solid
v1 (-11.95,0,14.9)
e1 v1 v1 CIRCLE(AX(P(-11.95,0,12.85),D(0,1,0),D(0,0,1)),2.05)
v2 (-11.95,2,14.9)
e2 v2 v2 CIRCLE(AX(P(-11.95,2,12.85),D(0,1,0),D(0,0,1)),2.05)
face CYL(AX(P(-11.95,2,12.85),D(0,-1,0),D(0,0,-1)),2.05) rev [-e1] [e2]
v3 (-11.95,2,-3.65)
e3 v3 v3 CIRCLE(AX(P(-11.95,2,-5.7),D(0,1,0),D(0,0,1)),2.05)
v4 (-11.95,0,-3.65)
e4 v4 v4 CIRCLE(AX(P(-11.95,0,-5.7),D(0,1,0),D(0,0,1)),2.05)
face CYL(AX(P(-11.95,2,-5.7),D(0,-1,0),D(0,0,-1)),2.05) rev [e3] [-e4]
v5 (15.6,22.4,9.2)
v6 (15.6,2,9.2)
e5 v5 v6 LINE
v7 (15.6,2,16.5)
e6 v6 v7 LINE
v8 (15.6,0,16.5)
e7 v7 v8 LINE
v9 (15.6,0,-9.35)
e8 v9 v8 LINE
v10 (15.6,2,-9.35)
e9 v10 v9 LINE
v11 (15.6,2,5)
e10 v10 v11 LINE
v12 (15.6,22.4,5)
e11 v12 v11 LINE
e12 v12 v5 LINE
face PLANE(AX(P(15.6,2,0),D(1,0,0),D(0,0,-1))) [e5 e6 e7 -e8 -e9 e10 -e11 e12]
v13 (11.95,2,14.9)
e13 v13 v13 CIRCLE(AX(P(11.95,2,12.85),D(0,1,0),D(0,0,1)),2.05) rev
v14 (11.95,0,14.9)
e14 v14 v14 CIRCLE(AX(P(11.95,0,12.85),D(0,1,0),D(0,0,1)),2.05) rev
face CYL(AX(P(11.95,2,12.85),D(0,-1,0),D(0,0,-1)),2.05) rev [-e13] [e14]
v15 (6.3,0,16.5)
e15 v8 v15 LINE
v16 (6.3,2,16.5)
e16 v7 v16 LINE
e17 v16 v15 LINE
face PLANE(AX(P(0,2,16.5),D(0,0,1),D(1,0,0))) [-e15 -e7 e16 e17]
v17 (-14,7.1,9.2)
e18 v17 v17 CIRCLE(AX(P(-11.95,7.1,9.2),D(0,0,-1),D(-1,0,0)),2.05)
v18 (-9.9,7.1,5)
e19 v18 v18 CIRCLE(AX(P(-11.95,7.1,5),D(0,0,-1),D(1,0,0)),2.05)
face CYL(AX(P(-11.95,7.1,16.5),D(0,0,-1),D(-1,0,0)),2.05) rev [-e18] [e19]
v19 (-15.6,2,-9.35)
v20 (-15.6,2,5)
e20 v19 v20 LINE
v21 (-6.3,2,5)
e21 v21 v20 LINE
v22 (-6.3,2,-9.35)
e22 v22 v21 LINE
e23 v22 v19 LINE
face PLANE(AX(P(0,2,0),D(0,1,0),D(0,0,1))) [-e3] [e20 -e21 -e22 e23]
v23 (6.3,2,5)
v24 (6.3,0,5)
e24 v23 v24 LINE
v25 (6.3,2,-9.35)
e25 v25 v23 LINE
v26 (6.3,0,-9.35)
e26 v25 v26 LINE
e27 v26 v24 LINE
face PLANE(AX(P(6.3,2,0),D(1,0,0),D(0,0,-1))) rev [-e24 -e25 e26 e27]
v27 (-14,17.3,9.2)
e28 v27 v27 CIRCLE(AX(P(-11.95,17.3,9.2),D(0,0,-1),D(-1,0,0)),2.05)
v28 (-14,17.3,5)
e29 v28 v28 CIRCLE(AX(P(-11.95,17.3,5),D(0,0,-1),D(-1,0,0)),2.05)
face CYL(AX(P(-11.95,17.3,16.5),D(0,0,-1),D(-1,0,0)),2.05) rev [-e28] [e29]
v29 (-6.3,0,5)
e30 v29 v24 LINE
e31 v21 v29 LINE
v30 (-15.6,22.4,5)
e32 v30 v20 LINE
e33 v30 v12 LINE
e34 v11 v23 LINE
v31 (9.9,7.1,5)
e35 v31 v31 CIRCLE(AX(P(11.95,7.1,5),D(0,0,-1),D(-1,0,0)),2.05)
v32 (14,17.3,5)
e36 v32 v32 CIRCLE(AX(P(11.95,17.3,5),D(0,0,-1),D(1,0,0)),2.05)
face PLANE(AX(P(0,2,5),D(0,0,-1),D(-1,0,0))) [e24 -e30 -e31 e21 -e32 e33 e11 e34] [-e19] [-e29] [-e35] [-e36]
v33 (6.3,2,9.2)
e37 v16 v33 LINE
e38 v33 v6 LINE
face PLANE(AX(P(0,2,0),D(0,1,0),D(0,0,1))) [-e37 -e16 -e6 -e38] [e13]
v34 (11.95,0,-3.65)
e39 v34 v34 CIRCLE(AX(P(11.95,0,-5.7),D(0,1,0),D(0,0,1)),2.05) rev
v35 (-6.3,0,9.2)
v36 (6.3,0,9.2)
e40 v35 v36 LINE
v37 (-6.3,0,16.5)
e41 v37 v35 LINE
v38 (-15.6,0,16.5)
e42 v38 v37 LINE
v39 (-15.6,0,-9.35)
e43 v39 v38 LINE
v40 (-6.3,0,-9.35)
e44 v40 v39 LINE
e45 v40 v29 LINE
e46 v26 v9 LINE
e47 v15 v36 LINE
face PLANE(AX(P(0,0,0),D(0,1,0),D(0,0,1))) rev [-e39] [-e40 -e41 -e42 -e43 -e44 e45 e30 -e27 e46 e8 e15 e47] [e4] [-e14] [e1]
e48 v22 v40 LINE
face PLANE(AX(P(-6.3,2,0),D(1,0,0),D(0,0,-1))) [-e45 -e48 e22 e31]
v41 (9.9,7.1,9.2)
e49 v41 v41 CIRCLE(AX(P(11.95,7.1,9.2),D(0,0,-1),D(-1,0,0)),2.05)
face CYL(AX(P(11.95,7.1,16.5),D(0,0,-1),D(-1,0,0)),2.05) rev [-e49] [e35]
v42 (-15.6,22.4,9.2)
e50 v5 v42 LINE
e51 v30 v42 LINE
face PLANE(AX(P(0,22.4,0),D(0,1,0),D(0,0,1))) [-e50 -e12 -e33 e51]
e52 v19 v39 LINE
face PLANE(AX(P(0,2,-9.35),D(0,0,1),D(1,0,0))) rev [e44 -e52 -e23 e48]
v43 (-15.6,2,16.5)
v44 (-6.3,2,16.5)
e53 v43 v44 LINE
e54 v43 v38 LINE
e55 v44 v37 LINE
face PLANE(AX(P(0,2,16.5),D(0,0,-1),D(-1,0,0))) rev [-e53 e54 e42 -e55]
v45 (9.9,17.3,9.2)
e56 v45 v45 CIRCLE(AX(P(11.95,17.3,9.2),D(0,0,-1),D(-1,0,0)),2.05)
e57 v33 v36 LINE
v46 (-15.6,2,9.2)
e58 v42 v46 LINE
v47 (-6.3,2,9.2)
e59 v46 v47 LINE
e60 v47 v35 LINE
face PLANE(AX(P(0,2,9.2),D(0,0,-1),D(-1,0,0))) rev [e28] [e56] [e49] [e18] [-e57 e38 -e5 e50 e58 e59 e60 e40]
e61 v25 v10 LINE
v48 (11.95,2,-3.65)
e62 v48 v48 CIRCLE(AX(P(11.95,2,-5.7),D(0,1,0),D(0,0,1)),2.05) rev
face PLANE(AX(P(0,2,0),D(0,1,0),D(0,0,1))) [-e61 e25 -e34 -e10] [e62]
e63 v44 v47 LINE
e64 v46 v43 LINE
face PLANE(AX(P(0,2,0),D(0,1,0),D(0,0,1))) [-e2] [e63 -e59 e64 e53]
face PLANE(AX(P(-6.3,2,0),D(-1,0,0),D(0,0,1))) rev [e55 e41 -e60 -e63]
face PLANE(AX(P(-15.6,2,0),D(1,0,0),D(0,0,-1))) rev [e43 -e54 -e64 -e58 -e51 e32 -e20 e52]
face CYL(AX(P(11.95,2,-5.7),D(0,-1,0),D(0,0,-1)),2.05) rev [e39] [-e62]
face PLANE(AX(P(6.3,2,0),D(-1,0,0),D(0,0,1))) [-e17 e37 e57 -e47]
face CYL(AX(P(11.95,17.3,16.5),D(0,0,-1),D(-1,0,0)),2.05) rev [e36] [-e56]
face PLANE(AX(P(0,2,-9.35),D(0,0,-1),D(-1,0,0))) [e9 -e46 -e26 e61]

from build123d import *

# Parameters (mm, degrees)
SKETCH1_R               = 2.05
BOSS_EXTRUDE1_DEPTH     = 2
BOSS_EXTRUDE2_START     = 2
BOSS_EXTRUDE2_OUTLINE_W = 31.2
BOSS_EXTRUDE2_OUTLINE_H = 4.2
BOSS_EXTRUDE2_DEPTH     = 20.4
SKETCH2_R               = 2.05
CUT_EXTRUDE1_DEPTH      = 31.838976961


# Read off the part's stored shape, not the designer's step: Boss-Extrude2
with BuildPart() as part:
    # Sketch1 → Boss-Extrude1 (new body)
    with BuildSketch(Plane(origin=(0, 0, 0), x_dir=(1, 0, 0), z_dir=(0, 1, 0))):
        Polygon((-6.3, -5), (-6.3, 9.35), (-15.6, 9.35), (-15.6, -16.5), (-6.3, -16.5), (-6.3, -9.2), (6.3, -9.2), (6.3, -16.5), (15.6, -16.5), (15.6, 9.35), (6.3, 9.35), (6.3, -5), align=None)
        with Locations(Location((11.95, -12.85, 0), (0, 0, 270))):
            Circle(SKETCH1_R, mode=Mode.SUBTRACT)
        with Locations(Location((-11.95, -12.85, 0), (0, 0, 270))):
            Circle(SKETCH1_R, mode=Mode.SUBTRACT)
        with Locations(Location((11.95, 5.7, 0), (0, 0, 270))):
            Circle(SKETCH1_R, mode=Mode.SUBTRACT)
        with Locations(Location((-11.95, 5.7, 0), (0, 0, 270))):
            Circle(SKETCH1_R, mode=Mode.SUBTRACT)
    extrude(amount=BOSS_EXTRUDE1_DEPTH)

    # Boss-Extrude2 outline → Boss-Extrude2 (add)
    with BuildSketch(Plane(origin=(0, 0, 0), x_dir=(1, 0, 0), z_dir=(0, 1, 0)).offset(BOSS_EXTRUDE2_START)):
        with Locations((0, -7.1)):
            Rectangle(BOSS_EXTRUDE2_OUTLINE_W, BOSS_EXTRUDE2_OUTLINE_H)
    extrude(amount=BOSS_EXTRUDE2_DEPTH)

    # Sketch2 → Cut-Extrude1 (cut, through all)
    with BuildSketch(Plane(origin=(0, 0, 5), x_dir=(-1, 0, 0), z_dir=(0, 0, -1))):
        with Locations((-11.95, 7.1)):
            Circle(SKETCH2_R)
        with Locations((-11.95, 17.3)):
            Circle(SKETCH2_R)
        with Locations((11.95, 7.1)):
            Circle(SKETCH2_R)
        with Locations((11.95, 17.3)):
            Circle(SKETCH2_R)
    extrude(amount=-CUT_EXTRUDE1_DEPTH, mode=Mode.SUBTRACT)


solid = part.part
